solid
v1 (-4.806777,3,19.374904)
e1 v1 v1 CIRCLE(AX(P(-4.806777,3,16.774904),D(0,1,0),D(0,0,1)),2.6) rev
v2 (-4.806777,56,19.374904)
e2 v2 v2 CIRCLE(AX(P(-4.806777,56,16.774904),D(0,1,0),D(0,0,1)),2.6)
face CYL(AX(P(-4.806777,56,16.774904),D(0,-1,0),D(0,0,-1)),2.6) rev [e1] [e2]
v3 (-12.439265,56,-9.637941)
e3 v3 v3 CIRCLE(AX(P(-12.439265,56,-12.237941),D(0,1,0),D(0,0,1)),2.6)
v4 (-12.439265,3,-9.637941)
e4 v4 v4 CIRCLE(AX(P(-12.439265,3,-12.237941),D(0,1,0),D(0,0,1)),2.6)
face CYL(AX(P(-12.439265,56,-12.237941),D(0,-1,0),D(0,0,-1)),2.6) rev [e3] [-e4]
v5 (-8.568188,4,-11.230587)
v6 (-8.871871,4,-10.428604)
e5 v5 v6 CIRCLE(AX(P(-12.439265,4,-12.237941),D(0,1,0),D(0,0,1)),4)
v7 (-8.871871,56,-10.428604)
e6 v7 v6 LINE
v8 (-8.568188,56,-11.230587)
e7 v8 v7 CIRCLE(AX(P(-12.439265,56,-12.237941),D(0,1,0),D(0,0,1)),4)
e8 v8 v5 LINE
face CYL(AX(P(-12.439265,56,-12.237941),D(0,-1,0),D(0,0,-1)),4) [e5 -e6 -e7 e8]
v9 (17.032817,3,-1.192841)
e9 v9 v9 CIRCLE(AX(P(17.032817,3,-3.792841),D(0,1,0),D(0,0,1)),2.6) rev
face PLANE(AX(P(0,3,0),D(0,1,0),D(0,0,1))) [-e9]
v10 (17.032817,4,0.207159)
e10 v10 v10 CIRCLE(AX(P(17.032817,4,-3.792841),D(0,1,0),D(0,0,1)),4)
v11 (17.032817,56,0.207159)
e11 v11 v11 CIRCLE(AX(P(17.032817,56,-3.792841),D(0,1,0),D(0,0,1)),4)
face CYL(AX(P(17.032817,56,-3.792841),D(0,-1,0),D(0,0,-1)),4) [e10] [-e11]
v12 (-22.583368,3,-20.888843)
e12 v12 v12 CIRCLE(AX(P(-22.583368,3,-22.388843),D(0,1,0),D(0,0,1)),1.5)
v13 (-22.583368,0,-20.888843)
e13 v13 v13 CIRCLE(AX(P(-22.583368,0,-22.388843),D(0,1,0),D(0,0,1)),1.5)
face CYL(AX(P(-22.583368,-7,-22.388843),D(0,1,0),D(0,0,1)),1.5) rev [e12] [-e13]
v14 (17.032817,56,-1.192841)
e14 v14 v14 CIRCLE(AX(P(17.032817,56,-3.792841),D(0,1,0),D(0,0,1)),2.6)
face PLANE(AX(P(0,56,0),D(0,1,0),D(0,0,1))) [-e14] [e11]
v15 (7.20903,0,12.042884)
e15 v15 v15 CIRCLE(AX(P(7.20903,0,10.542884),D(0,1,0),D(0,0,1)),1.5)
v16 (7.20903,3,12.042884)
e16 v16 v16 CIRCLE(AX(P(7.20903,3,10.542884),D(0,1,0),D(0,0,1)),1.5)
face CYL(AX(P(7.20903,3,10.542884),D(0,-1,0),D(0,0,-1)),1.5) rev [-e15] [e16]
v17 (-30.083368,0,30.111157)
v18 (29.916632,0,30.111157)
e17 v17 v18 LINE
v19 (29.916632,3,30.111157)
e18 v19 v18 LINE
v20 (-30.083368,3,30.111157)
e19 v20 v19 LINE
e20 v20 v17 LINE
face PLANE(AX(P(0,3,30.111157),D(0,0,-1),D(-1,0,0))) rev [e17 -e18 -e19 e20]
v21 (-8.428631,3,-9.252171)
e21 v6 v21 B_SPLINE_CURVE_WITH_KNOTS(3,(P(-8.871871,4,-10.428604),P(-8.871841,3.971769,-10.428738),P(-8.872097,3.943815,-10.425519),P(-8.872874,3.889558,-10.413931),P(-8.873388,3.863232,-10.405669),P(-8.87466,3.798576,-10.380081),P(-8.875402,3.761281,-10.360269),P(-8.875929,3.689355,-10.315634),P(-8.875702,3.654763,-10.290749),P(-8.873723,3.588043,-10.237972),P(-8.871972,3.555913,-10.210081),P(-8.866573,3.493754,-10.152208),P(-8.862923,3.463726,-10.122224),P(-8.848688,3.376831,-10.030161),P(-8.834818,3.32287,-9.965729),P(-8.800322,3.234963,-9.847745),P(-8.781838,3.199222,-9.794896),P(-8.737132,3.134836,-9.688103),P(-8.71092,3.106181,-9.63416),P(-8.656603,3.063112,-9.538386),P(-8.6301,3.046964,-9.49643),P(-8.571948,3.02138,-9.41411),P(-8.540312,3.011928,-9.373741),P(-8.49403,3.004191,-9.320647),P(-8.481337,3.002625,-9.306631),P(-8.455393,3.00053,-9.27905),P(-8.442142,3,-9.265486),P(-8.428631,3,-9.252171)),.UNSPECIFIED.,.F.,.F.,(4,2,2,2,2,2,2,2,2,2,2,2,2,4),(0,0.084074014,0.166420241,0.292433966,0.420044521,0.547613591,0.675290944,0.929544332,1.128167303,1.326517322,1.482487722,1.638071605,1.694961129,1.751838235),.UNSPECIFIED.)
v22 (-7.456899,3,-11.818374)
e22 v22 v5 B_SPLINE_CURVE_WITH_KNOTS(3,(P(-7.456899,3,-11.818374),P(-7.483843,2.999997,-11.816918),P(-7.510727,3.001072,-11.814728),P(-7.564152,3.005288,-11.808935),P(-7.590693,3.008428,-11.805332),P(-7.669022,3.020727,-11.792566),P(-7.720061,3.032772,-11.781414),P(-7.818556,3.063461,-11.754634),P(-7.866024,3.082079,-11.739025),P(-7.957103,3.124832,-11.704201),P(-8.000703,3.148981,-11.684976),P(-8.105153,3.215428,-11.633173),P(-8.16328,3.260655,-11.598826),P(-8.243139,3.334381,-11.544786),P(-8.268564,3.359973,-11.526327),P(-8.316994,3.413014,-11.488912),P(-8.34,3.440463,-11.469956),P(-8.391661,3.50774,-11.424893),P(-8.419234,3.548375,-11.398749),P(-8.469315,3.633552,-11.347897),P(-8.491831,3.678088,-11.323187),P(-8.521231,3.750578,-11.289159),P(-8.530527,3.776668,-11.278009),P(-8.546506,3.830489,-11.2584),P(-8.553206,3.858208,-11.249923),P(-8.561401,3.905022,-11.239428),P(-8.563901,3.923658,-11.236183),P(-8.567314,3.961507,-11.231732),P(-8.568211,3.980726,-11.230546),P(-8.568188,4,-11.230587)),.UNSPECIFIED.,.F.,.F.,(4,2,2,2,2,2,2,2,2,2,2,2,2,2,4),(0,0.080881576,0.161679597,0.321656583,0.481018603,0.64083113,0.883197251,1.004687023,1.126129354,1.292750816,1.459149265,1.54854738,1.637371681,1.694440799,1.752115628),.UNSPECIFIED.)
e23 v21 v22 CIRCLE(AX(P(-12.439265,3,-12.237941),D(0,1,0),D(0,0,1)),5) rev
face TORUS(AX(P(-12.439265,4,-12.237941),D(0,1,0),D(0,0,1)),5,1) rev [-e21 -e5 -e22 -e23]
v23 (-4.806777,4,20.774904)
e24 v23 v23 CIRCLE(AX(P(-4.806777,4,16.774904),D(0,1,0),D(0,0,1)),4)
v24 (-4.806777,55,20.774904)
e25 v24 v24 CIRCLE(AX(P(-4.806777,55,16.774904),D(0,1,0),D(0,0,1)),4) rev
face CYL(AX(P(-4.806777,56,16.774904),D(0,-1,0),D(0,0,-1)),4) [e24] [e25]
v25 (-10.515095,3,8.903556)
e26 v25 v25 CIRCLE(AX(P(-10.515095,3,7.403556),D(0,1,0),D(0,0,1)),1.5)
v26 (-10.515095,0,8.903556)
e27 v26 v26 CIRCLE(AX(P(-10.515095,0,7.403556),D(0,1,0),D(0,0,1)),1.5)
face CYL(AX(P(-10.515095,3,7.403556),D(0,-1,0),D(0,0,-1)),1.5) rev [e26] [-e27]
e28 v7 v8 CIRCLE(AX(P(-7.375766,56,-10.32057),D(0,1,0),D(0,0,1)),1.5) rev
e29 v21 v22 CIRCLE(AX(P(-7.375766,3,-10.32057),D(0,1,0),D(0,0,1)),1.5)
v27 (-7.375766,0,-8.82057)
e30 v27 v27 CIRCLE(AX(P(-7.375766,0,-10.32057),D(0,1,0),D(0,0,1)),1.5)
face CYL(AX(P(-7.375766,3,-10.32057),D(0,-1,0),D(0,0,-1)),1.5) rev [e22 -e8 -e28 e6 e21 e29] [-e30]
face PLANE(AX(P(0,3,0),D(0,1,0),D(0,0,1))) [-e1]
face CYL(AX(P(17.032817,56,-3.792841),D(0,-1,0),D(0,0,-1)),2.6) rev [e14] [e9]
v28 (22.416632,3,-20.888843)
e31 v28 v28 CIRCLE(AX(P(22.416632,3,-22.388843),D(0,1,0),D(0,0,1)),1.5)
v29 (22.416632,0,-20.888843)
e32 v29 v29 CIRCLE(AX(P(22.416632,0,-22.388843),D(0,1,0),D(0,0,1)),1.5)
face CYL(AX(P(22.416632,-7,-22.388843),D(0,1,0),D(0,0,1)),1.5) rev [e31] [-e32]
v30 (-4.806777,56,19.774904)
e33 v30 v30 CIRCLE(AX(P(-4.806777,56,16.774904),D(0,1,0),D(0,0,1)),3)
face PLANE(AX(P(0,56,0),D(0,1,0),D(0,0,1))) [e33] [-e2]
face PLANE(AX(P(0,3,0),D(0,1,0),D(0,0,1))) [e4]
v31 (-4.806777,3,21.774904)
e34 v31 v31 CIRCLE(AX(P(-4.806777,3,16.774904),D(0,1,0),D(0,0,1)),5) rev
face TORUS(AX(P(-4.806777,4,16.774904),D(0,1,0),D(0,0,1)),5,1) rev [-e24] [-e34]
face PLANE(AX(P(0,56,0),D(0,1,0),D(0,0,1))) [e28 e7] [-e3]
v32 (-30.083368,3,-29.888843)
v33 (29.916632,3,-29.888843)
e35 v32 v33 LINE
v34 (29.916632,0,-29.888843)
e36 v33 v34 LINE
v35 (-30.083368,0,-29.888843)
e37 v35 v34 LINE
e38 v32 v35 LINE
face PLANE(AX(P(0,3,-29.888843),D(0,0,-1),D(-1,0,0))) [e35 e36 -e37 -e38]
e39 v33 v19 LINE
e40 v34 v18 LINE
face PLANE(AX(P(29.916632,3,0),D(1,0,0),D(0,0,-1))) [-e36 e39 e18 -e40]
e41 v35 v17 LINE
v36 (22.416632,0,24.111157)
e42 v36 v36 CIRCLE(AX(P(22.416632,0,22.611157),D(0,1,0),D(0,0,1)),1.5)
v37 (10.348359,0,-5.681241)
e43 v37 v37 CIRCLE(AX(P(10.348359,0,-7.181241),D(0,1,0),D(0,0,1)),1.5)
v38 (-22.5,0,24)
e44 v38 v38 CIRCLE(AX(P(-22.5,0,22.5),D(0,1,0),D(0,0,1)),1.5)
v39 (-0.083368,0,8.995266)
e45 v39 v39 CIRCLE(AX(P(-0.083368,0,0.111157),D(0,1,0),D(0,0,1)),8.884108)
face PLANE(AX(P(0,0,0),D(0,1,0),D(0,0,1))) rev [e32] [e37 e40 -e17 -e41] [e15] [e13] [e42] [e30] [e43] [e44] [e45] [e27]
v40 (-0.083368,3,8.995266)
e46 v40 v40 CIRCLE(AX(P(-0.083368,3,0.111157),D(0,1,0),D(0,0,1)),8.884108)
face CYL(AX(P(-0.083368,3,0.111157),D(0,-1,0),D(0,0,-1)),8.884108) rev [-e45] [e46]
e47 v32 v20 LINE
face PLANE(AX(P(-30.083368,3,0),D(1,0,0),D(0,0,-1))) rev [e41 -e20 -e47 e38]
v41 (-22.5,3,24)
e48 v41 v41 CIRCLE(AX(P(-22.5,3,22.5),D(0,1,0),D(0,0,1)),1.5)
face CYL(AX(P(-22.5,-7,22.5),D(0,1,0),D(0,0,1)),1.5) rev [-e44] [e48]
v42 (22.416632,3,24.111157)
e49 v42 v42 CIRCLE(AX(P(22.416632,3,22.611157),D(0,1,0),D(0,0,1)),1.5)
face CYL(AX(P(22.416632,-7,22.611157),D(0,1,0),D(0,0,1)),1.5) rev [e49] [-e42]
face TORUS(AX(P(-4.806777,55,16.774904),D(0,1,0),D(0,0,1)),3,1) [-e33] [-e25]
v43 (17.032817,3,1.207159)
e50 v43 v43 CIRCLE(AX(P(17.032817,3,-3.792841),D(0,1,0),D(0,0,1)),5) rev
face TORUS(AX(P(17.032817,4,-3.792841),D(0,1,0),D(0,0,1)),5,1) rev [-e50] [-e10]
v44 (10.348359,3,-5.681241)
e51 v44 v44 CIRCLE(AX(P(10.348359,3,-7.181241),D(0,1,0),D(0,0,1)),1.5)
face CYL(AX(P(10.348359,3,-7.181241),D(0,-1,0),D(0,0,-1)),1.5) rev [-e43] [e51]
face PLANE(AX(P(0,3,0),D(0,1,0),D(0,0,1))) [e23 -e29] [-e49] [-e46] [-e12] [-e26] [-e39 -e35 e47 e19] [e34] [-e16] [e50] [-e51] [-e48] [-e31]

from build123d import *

# Parameters (mm, degrees)
SKETCH1_W                 = 60
SKETCH1_H                 = 60
SKETCH1_R                 = 8.884108342
SKETCH1_R_2               = 1.5
BOSS_EXTRUDE2_DEPTH       = 3
SKETCH2_R                 = 1.5
CUT_EXTRUDE1_DEPTH        = 10
BOSS_EXTRUDE3_OUTLINE_R   = 2.6
BOSS_EXTRUDE3_OUTLINE_R_2 = 4
BOSS_EXTRUDE3_DEPTH       = 53
FILLET1_R                 = 1
FILLET2_R                 = 1


# Read off the part's stored shape, not the designer's step: Boss-Extrude3
with BuildPart() as part:
    # Sketch1 → Boss-Extrude2 (new body)
    with BuildSketch(Plane(origin=(0, 0, 0), x_dir=(1, 0, 0), z_dir=(0, 1, 0))):
        with Locations((-0.083367938, -0.111157251)):
            Rectangle(SKETCH1_W, SKETCH1_H)
        with Locations(Location((-0.083367938, -0.111157251, 0), (0, 0, 270))):
            Circle(SKETCH1_R, mode=Mode.SUBTRACT)
        with Locations(Location((-10.515094807, -7.403555658, 0), (0, 0, 270))):
            Circle(SKETCH1_R_2, mode=Mode.SUBTRACT)
        with Locations(Location((7.209030469, -10.54288412, 0), (0, 0, 270))):
            Circle(SKETCH1_R_2, mode=Mode.SUBTRACT)
        with Locations(Location((10.348358931, 7.181241156, 0), (0, 0, 270))):
            Circle(SKETCH1_R_2, mode=Mode.SUBTRACT)
        with Locations(Location((-7.375766345, 10.320569618, 0), (0, 0, 270))):
            Circle(SKETCH1_R_2, mode=Mode.SUBTRACT)
    extrude(amount=BOSS_EXTRUDE2_DEPTH)

    # Sketch2 → Cut-Extrude1 (cut)
    with BuildSketch(Plane(origin=(0, 3, 0), x_dir=(1, 0, 0), z_dir=(0, 1, 0))):
        with Locations(Location((-22.583367938, 22.388842749, 0), (0, 0, 270))):
            Circle(SKETCH2_R)
        with Locations(Location((22.416632062, 22.388842749, 0), (0, 0, 270))):
            Circle(SKETCH2_R)
        with Locations(Location((22.416632062, -22.611157251, 0), (0, 0, 270))):
            Circle(SKETCH2_R)
        with Locations(Location((-22.5, -22.5, 0), (0, 0, 270))):
            Circle(SKETCH2_R)
    extrude(amount=-CUT_EXTRUDE1_DEPTH, mode=Mode.SUBTRACT)

    # Boss-Extrude3 outline → Boss-Extrude3 (add)
    # profile 1 of 3: a face of its own
    with BuildSketch(Plane(origin=(0, 3, 0), x_dir=(1, 0, 0), z_dir=(0, 1, 0))):
        with BuildLine():
            ThreePointArc((-8.871870842, 10.428603567), (-8.778562467, 10.85175983), (-8.568187528, 11.230587048))
            ThreePointArc((-8.568187528, 11.230587048), (-16.180054368, 13.654447968), (-8.871870842, 10.428603567))
        make_face()
        with Locations((-12.43926471, 12.237940737)):
            Circle(BOSS_EXTRUDE3_OUTLINE_R, mode=Mode.SUBTRACT)
    # profile 2 of 3: a face of its own
    with BuildSketch(Plane(origin=(0, 3, 0), x_dir=(1, 0, 0), z_dir=(0, 1, 0))):
        with Locations((-4.806777383, -16.774903612)):
            Circle(BOSS_EXTRUDE3_OUTLINE_R_2)
        with Locations((-4.806777383, -16.774903612)):
            Circle(BOSS_EXTRUDE3_OUTLINE_R, mode=Mode.SUBTRACT)
    # profile 3 of 3: a face of its own
    with BuildSketch(Plane(origin=(0, 3, 0), x_dir=(1, 0, 0), z_dir=(0, 1, 0))):
        with Locations((17.032817093, 3.792840871)):
            Circle(BOSS_EXTRUDE3_OUTLINE_R_2)
        with Locations((17.032817093, 3.792840871)):
            Circle(BOSS_EXTRUDE3_OUTLINE_R, mode=Mode.SUBTRACT)
    extrude(amount=BOSS_EXTRUDE3_DEPTH)

    # Fillet1
    # the kernel refuses this fillet: 1 mm, written as the material it adds along each edge
    with BuildSketch(Plane(origin=(-12.43926471, 3, -12.237940737), x_dir=(0.9363053197768356, 0, 0.3511870557944836), z_dir=(-0.3511870557944836, 0, 0.9363053197768356))) as fillet1_piece_1_section:
        with BuildLine():
            CenterArc((4 + FILLET1_R, FILLET1_R), FILLET1_R, 180, 90)
            Line((4, FILLET1_R), (4, 0))
            Line((4, 0), (4 + FILLET1_R, 0))
        make_face()
    fillet1_piece_1 = revolve(axis=Axis((-12.43926471, 3, -12.237940737), (0, 1, 0)), revolution_arc=359.64, mode=Mode.PRIVATE)
    fillet1_piece_1 = fillet1_piece_1 - Plane(origin=(-7.375766345, 3.279775491, -10.320569618), x_dir=(0, 0, 1), z_dir=(0, -1, 0)) * Cylinder(1.5, 21, mode=Mode.PRIVATE)
    add(fillet1_piece_1)

    # Fillet2
    fillet2_edges = [part.edges().sort_by_distance(p)[0] for p in [
        (-8.806777383, 3, 16.774903612),
        (-8.806777383, 56, 16.774903612),
        (13.032817093, 3, -3.792840871),
    ]]
    fillet(fillet2_edges, radius=FILLET2_R)


solid = part.part
